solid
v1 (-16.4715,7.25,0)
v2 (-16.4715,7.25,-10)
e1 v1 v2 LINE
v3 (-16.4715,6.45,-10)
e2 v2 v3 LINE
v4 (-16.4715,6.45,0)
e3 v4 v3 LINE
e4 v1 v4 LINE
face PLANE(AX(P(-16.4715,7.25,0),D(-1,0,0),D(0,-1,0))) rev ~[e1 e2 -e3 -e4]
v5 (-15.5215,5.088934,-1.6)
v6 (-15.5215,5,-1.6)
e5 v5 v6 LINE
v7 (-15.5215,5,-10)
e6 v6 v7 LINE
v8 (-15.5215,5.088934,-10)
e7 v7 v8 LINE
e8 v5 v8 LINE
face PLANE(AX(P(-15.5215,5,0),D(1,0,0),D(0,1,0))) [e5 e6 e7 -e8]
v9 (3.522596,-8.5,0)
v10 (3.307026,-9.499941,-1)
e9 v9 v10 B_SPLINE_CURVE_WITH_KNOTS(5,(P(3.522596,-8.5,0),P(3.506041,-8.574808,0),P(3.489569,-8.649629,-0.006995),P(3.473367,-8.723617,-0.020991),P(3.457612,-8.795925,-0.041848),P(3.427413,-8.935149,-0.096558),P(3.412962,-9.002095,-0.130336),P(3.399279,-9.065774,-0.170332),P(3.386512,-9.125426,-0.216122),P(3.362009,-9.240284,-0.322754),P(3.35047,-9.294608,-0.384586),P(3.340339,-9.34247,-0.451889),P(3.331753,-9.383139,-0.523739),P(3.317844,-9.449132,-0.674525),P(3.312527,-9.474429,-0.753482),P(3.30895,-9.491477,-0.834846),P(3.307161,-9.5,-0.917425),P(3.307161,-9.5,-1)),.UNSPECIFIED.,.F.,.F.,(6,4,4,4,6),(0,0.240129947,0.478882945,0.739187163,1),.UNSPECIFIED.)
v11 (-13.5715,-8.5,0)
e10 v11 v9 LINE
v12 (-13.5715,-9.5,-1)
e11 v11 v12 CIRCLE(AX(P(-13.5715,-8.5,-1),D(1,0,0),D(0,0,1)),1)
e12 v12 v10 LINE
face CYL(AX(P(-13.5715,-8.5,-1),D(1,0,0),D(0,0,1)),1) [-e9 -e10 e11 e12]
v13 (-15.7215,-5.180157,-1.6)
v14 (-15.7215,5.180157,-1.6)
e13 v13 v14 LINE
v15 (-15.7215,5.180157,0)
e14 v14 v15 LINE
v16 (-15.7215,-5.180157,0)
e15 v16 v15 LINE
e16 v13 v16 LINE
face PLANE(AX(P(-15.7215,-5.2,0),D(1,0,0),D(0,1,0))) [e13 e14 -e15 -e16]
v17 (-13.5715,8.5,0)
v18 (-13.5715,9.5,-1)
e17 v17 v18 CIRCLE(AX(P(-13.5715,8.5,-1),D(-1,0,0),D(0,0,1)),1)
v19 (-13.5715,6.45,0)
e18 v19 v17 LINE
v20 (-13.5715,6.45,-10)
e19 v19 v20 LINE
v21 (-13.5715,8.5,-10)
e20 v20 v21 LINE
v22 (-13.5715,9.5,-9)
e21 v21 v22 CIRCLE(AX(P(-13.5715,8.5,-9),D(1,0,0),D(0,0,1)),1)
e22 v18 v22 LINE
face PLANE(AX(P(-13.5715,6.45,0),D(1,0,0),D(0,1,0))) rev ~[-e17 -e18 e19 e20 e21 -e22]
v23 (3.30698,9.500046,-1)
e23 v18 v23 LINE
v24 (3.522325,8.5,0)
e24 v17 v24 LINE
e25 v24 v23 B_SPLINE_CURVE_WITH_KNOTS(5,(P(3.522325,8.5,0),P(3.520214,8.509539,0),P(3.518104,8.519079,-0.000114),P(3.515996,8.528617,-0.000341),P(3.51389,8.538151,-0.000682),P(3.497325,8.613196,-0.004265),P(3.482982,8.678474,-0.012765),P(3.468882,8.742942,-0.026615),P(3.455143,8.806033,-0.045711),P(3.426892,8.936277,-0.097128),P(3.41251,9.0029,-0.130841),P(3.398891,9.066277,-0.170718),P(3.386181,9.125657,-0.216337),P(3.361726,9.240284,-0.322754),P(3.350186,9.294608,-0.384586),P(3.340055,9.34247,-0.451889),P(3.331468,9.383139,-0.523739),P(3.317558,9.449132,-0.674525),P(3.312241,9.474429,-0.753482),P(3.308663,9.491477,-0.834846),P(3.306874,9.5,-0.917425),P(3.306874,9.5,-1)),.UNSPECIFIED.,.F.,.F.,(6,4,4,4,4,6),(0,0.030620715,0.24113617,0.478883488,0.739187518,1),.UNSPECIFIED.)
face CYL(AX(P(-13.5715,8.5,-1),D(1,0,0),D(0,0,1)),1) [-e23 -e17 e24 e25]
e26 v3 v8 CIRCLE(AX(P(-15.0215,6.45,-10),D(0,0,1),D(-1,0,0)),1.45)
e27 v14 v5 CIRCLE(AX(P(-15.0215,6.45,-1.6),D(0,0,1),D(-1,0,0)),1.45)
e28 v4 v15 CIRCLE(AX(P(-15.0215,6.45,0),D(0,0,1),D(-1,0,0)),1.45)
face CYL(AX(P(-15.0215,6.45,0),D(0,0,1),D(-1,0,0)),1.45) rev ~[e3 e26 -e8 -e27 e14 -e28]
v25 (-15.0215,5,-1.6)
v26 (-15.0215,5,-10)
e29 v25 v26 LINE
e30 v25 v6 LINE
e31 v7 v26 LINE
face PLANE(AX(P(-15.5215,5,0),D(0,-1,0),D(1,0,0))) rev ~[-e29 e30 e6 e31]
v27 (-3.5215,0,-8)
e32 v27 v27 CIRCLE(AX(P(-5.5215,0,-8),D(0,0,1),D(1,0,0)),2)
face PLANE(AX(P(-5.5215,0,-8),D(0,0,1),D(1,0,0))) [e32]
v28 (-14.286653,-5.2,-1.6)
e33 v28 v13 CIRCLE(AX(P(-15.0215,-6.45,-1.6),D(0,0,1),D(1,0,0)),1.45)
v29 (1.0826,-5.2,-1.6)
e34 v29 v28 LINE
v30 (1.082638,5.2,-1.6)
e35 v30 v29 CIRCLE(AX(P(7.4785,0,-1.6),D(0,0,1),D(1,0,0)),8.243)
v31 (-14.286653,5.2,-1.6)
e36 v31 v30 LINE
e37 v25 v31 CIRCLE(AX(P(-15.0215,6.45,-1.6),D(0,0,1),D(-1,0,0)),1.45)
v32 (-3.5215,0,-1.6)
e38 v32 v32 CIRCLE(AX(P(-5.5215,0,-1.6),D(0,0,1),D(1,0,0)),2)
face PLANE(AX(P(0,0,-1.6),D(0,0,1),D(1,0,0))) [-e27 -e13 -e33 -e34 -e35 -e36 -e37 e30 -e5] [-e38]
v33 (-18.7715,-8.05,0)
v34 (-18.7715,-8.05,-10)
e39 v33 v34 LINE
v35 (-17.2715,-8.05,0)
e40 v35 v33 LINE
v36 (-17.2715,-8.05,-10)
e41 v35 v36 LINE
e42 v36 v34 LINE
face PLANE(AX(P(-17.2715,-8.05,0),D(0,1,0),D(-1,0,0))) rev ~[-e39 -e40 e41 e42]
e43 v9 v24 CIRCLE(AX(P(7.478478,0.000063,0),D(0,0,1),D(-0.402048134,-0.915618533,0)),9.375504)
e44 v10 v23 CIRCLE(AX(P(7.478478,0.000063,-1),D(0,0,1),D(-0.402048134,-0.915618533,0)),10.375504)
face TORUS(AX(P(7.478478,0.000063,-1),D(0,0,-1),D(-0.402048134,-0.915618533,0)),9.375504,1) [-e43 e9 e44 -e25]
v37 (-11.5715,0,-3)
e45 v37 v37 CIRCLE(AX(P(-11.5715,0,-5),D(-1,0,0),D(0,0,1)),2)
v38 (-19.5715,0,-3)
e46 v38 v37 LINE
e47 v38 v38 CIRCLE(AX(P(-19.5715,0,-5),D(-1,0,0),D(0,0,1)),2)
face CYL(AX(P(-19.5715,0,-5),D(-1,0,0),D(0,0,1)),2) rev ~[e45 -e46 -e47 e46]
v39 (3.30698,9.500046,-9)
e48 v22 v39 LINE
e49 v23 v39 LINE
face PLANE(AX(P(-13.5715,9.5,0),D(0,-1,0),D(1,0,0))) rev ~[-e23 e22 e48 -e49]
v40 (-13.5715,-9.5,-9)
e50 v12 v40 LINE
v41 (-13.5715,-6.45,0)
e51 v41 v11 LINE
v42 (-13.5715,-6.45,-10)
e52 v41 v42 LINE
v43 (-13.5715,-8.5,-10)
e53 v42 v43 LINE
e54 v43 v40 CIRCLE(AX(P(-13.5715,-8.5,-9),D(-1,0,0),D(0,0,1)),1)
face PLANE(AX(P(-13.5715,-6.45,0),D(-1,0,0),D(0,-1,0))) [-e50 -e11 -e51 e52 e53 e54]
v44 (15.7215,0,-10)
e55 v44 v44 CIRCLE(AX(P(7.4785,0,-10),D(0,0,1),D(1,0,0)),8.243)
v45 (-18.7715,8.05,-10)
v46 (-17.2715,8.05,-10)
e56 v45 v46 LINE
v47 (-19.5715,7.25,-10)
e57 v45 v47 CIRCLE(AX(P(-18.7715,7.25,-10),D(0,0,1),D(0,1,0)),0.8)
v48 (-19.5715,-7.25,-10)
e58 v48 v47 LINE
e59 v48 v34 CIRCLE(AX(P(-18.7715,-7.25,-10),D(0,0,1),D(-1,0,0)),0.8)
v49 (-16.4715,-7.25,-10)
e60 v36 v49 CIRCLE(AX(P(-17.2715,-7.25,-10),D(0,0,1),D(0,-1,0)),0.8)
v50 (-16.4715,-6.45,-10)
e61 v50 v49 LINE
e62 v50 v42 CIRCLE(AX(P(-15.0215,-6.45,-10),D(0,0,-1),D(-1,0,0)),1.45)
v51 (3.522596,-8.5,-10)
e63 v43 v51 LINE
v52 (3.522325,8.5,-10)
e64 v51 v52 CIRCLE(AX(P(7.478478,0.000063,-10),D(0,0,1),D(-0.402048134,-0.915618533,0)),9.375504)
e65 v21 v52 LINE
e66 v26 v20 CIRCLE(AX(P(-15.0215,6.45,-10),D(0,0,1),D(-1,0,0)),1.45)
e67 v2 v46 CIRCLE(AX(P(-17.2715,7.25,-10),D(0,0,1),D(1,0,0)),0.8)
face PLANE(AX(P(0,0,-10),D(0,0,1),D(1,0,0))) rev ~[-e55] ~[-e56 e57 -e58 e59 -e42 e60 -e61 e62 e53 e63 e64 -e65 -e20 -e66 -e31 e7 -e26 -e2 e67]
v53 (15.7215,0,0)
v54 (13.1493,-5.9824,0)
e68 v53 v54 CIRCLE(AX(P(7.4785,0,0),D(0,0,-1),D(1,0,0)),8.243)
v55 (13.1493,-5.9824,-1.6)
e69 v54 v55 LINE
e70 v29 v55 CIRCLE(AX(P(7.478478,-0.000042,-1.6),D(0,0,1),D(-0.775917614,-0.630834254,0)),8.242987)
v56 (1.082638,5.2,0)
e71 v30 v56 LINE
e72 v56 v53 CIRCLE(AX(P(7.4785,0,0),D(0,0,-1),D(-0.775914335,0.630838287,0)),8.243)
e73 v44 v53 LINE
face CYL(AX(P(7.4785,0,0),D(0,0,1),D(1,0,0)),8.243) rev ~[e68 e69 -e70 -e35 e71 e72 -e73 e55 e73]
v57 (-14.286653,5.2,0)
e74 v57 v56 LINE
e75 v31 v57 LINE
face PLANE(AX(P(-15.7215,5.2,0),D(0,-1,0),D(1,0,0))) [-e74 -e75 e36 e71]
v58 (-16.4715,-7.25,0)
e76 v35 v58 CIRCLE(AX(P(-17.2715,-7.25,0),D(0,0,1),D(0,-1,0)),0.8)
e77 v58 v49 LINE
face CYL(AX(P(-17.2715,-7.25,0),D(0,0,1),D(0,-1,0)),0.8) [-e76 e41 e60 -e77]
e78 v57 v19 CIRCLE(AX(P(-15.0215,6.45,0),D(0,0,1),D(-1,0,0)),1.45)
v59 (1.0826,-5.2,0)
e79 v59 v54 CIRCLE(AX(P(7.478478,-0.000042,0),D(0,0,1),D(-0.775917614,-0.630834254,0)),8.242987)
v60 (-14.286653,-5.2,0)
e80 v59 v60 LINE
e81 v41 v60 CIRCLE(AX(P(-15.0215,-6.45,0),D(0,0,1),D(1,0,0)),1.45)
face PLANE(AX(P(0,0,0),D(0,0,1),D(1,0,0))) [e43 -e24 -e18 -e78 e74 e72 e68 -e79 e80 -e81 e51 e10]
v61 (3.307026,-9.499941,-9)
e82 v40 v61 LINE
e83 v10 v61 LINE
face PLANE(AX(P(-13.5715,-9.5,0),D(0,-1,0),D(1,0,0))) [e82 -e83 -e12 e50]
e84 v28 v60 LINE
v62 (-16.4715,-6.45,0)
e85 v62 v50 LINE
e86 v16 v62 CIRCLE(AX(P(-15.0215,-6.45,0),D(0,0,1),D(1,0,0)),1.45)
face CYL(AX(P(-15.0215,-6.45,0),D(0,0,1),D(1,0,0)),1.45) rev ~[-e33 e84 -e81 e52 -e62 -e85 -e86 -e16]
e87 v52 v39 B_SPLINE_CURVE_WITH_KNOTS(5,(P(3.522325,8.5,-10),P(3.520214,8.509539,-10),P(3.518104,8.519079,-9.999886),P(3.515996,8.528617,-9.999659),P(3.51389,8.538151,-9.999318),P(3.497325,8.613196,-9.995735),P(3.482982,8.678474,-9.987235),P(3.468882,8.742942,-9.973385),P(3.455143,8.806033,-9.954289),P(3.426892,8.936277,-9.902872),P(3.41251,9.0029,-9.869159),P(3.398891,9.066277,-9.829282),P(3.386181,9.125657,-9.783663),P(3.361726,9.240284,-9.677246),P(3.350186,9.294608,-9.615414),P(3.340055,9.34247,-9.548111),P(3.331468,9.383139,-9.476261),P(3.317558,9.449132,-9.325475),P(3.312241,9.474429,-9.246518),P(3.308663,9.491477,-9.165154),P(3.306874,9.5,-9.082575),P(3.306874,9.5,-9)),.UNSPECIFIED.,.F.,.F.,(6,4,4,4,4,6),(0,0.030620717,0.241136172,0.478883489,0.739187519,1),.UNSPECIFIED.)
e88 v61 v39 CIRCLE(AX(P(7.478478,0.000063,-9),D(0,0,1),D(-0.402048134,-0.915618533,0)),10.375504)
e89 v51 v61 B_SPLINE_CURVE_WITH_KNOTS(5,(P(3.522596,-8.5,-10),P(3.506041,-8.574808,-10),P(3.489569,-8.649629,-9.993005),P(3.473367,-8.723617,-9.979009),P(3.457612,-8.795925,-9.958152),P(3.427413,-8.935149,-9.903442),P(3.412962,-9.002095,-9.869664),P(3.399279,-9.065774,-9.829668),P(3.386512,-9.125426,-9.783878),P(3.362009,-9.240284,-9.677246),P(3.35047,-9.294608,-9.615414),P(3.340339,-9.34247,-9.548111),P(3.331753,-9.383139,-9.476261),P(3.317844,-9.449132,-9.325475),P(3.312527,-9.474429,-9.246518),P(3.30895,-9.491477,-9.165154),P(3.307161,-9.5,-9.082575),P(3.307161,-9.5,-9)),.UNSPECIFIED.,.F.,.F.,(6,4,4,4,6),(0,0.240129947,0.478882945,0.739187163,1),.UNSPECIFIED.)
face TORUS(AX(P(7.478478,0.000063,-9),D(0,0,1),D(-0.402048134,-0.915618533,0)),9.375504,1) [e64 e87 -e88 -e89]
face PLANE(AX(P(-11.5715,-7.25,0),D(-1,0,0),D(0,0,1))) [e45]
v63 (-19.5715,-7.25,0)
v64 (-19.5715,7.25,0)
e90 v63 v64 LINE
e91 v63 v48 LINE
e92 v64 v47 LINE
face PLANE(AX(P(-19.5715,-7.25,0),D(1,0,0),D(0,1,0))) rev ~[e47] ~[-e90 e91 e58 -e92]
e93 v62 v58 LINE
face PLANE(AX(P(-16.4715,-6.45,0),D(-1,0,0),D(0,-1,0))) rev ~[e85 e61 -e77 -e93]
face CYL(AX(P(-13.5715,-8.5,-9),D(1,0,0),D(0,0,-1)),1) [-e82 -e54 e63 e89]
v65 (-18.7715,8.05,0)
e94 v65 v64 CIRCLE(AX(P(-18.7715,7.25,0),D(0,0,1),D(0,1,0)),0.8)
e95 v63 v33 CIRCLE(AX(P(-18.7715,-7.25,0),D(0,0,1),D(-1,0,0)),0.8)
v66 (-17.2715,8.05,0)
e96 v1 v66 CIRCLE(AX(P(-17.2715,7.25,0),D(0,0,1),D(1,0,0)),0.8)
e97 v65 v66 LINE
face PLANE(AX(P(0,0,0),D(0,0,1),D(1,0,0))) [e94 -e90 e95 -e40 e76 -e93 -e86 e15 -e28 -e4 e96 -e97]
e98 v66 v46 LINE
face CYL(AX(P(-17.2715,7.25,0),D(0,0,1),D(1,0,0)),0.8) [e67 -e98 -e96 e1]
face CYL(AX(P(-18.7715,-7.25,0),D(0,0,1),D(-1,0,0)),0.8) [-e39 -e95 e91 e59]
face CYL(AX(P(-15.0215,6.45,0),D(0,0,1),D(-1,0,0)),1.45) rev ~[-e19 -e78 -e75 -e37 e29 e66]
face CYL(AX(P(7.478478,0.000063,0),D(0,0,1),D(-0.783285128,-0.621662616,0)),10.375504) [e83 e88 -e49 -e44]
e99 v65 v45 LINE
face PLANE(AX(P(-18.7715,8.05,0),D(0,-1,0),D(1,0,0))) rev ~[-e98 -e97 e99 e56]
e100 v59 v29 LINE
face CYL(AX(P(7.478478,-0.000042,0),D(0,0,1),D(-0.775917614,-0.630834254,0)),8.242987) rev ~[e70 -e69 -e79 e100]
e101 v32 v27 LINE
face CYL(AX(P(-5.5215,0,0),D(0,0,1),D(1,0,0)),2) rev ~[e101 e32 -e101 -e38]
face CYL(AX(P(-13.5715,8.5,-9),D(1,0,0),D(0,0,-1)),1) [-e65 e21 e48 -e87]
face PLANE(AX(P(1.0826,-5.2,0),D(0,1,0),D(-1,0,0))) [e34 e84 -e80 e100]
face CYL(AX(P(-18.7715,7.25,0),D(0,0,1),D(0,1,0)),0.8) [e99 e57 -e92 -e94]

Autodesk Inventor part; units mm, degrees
ref_plane "YZ Plane" through (0, 0, 0) normal (1, 0, 0) x (0, 1, 0)
ref_plane "XZ Plane" through (0, 0, 0) normal (0, 1, 0) x (-1, 0, 0)
ref_plane "XY Plane" through (0, 0, 0) normal (0, 0, 1) x (1, 0, 0)
sketch "Sketch1" plane through (0, 0, 0) normal (0, 0, 1) x (1, 0, 0)
  arc A0 (-13.7715, -6.45) -> (-16.2715, -6.45) centre (-15.0215, -6.45) ccw projected
  line L0 (-16.2715, -6.45) -> (-16.2715, -7.25) projected
  arc A1 (-17.2715, -8.25) -> (-16.2715, -7.25) centre (-17.2715, -7.25) ccw projected
  line L1 (-17.2715, -8.25) -> (-18.7715, -8.25) projected
  arc A2 (-19.7715, -7.25) -> (-18.7715, -8.25) centre (-18.7715, -7.25) ccw projected
  line L2 (-19.7715, -7.25) -> (-19.7715, 7.25) projected
  arc A3 (-18.7715, 8.25) -> (-19.7715, 7.25) centre (-18.7715, 7.25) ccw projected
  line L3 (-18.7715, 8.25) -> (-17.2715, 8.25) projected
  arc A4 (-16.2715, 7.25) -> (-17.2715, 8.25) centre (-17.2715, 7.25) ccw projected
  line L4 (-16.2715, 7.25) -> (-16.2715, 6.45) projected
  arc A5 (-16.2715, 6.45) -> (-13.7715, 6.45) centre (-15.0215, 6.45) ccw projected
  arc A6 (-13.5715, -6.45) -> (-16.4715, -6.45) centre (-15.0215, -6.45) ccw
  line L5 (-16.4715, -6.45) -> (-16.4715, -7.25)
  arc A7 (-17.2715, -8.05) -> (-16.4715, -7.25) centre (-17.2715, -7.25) ccw
  line L6 (-17.2715, -8.05) -> (-18.7715, -8.05)
  arc A8 (-19.5715, -7.25) -> (-18.7715, -8.05) centre (-18.7715, -7.25) ccw
  line L7 (-19.5715, -7.25) -> (-19.5715, 7.25)
  arc A9 (-18.7715, 8.05) -> (-19.5715, 7.25) centre (-18.7715, 7.25) ccw
  line L8 (-18.7715, 8.05) -> (-17.2715, 8.05)
  arc A10 (-16.4715, 7.25) -> (-17.2715, 8.05) centre (-17.2715, 7.25) ccw
  line L9 (-16.4715, 7.25) -> (-16.4715, 6.45)
  arc A11 (-16.4715, 6.45) -> (-13.5715, 6.45) centre (-15.0215, 6.45) ccw
  circle A12 centre (-5.5215, 0) radius 1.6 projected
  circle A13 centre (7.4785, 5) radius 0.5969 projected
  circle A14 centre (7.4785, -5) radius 0.5969 projected
  line L10 (13.4965, -5.336) -> (13.0086, -5.8402) projected
  arc A15 (13.4965, -5.336) -> (1.4605, 5.336) centre (7.4785, 0) ccw projected
  line L11 (1.1785, 5) -> (1.4605, 5.336) projected
  line L12 (-15.5215, 5) -> (1.1785, 5) projected
  line L13 (-15.5215, -5) -> (-15.5215, 5) projected
  line L14 (1.1785, -5) -> (-15.5215, -5) projected
  arc A16 (1.1785, -5) -> (13.0086, -5.8402) centre (7.4785, 0) ccw projected
  arc A17 (-0.6485, -6.45) -> (-0.6486, 6.45) centre (7.4785, 0) ccw
  line L15 (-0.6485, -6.45) -> (-15.5215, -6.45)
  line L16 (-15.5215, -6.45) -> (-15.5215, 6.45)
  line L17 (-15.5215, 6.45) -> (-0.6486, 6.45)
  line L18 (7.4785, 0) -> (-0.6485, -6.45)
  line L19 (7.4785, 0) -> (-0.6486, 6.45)
  circle A18 centre (7.4785, 0) radius 8.243
  point P0 (0, 0)
  point P1 (-15.03, 5)
  point P2 (-15.5215, 5.0889)
  point P3 (-13.5715, 6.45)
  dimension "d0" = 0.2
  dimension "d1" = 0.2
extrude "Extrusion1" add sketch "Sketch1" against normal blind 10 contours A6 L14 A18 L18 L15 | L16 L14 A6 | A6 L5 A7 L6 A8 L7 A9 L8 A10 L9 A11 L16 L13 | L14 L13 L12 A18 | L18 A18 L19 A17 | L19 A18 L12 A11 L17 | A12
sketch "Sketch2" plane through (0, 0, 0) normal (0, 0, 1) x (1, 0, 0)
  circle A0 centre (-5.5215, 0) radius 1.6 projected
  circle A1 centre (7.4785, 5) radius 0.5969 projected
  circle A2 centre (7.4785, -5) radius 0.5969 projected
  line L0 (13.4965, -5.336) -> (13.0086, -5.8402) projected
  arc A3 (13.4965, -5.336) -> (1.4605, 5.336) centre (7.4785, 0) ccw projected
  line L1 (1.1785, 5) -> (1.4605, 5.336) projected
  line L2 (-15.5215, 5) -> (1.1785, 5) projected
  line L3 (-15.5215, -5) -> (-15.5215, 5) projected
  line L4 (1.1785, -5) -> (-15.5215, -5) projected
  arc A4 (1.1785, -5) -> (13.0086, -5.8402) centre (7.4785, 0) ccw projected
  line L5 (-15.7215, 5.2) -> (1.0853, 5.2)
  line L6 (1.0853, 5.2) -> (1.309, 5.4667)
  arc A5 (13.6433, -5.472) -> (1.309, 5.4667) centre (7.4785, 0) ccw
  line L7 (13.6433, -5.472) -> (13.1493, -5.9824)
  arc A6 (1.0826, -5.2) -> (13.1493, -5.9824) centre (7.4785, 0) ccw
  line L8 (1.0826, -5.2) -> (-15.7215, -5.2)
  line L9 (-15.7215, -5.2) -> (-15.7215, 5.2)
  point P0 (0, 0)
  dimension "d4" = 0.2
extrude "Extrusion2" cut sketch "Sketch2" against normal blind 1.6 contours L0 A4 L4 L3 L2 L1 A3 | L5 L6 A5 L7 A6 L8 L9
sketch "Sketch3" plane through (-5.5215, 0, 0) normal (0, 0, 1) x (1, 0, 0)
  circle A0 centre (0, 0) radius 2
  point P0 (5.5215, 0)
  dimension "d7" = 4
extrude "Extrusion3" cut sketch "Sketch3" against normal blind 8
sketch "Sketch4" plane through (-19.5715, -7.25, 0) normal (-1, 0, 0) x (0, 0, 1)
  circle A0 centre (-5, 7.25) radius 2
  point P0 (0, 7.25)
  dimension "d10" = 4
  dimension "d11" = 5
extrude "Extrusion4" cut sketch "Sketch4" against normal blind 8
sketch "Sketch5" plane through (0, 0, 0) normal (0, 0, 1) x (1, 0, 0)
  line L0 (-13.7715, -9.5) -> (-13.7715, -6.45) projected
  line L1 (-13.7715, 6.45) -> (-13.7715, 9.5) projected
  line L2 (-13.7715, -9.5) -> (3.307, -9.5)
  arc A0 (-0.6485, -6.45) -> (-0.6486, 6.45) centre (7.4785, 0) ccw projected
  line L3 (-13.7715, 9.5) -> (3.307, 9.5)
  line L4 (-0.6485, -6.45) -> (-13.5715, -6.45) projected
  line L5 (-13.5715, -6.45) -> (-13.5715, -9.5)
  arc A1 (-15.03, 5) -> (-13.5715, 6.45) centre (-15.0215, 6.45) ccw projected
  line L6 (-13.5715, 6.45) -> (-13.5715, 9.5)
  line L7 (-0.6486, 6.45) -> (-13.5715, 6.45) projected
  point P0 (0, 0)
extrude "Extrusion5" add sketch "Sketch5" against normal up to surface (10 mm away)
fillet "Fillet2" radius 1 6 edges at (17.854, 0, 0) (-5.1322, -9.5, 0) (-5.1323, 9.5, 0) (17.854, 0, -10) (-5.1323, 9.5, -10) (-5.1322, -9.5, -10)
properties part number "TransducerPCB_Holder"
